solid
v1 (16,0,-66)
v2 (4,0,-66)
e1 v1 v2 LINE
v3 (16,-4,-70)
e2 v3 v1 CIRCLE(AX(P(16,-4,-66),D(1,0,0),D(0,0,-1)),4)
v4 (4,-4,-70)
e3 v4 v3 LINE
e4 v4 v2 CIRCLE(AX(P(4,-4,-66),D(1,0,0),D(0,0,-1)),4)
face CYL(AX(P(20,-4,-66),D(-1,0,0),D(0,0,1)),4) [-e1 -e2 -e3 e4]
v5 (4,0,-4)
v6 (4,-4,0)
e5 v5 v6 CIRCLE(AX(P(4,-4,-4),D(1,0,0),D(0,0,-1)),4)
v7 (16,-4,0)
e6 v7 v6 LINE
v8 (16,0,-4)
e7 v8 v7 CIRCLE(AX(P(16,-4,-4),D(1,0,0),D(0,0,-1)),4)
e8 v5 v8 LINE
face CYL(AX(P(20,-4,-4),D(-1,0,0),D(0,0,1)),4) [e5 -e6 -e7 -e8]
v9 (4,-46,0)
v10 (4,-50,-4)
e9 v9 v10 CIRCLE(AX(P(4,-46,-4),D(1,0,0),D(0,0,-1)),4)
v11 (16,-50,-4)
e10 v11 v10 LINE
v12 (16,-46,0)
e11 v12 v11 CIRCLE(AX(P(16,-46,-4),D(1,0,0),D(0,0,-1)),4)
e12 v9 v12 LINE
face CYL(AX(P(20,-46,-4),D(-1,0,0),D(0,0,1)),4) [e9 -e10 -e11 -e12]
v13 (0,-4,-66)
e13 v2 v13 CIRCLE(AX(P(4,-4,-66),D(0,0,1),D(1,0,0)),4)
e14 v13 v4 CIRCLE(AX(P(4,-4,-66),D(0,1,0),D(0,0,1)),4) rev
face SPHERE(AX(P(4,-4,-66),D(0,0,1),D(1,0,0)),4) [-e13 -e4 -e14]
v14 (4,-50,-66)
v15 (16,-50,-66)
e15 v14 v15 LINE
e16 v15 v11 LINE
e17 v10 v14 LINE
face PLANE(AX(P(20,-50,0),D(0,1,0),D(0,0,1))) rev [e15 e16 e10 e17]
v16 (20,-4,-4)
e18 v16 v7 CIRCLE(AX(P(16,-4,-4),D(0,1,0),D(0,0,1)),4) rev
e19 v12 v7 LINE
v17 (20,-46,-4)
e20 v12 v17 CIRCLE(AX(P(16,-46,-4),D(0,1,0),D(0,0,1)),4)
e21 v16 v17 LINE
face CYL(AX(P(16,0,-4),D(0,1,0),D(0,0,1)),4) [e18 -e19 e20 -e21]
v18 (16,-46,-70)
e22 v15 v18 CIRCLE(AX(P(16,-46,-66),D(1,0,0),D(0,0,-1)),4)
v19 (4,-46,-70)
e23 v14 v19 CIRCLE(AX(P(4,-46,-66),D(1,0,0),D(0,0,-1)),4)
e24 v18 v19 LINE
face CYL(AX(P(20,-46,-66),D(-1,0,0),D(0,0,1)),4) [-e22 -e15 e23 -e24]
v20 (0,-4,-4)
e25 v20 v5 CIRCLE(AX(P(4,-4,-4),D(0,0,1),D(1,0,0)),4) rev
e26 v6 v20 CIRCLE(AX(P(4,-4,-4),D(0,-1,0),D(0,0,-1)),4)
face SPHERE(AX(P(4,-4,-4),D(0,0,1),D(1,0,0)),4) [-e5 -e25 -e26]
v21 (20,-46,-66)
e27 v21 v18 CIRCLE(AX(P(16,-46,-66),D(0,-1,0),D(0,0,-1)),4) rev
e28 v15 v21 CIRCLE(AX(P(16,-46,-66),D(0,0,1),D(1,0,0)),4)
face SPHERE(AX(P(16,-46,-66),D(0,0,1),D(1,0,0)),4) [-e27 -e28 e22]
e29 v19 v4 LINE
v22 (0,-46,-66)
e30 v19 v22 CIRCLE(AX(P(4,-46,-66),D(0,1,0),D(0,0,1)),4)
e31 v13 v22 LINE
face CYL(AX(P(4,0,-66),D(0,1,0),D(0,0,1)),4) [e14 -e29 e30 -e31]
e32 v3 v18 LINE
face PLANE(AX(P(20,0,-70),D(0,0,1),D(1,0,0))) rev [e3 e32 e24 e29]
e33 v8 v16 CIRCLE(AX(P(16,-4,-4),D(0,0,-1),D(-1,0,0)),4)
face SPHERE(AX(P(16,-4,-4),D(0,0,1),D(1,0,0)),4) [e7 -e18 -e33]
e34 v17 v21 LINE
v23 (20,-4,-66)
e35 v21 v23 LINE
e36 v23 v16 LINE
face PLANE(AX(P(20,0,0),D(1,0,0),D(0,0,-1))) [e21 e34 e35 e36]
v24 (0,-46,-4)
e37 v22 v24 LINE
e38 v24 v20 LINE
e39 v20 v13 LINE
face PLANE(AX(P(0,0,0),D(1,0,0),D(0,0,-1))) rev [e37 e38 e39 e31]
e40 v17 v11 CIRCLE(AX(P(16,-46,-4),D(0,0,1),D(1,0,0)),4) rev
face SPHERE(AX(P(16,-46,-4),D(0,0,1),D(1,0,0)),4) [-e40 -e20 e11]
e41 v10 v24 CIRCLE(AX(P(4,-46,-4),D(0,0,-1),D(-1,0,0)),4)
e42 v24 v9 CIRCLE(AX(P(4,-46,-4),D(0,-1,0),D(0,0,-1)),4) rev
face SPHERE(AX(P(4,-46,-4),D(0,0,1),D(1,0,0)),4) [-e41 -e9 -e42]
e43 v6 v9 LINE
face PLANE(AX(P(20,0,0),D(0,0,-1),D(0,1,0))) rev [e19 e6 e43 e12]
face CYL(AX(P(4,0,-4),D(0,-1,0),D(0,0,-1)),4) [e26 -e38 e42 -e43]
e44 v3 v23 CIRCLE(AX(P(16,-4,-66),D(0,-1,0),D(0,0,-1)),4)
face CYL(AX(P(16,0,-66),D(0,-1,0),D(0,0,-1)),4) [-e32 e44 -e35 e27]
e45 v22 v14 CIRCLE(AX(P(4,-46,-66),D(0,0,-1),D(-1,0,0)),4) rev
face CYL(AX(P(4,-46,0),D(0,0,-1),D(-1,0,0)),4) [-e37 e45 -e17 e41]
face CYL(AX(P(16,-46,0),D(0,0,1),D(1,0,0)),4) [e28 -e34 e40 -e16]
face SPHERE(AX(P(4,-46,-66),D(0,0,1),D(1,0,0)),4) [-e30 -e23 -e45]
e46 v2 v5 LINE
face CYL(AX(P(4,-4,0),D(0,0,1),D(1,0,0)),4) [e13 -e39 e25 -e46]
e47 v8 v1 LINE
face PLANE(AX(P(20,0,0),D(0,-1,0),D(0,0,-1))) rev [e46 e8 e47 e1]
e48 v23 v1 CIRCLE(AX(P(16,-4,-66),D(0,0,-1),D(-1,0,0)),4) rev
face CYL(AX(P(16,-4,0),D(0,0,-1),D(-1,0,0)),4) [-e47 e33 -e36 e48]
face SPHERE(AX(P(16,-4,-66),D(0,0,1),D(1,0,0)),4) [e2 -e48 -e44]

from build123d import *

# Parameters (mm, degrees)
SKETCH_1_W      = 70
SKETCH_1_H      = 50
EXTRUDE_1_DEPTH = 20
FILLET_1_R      = 4
FILLET_2_R      = 4
FILLET_3_R      = 4


with BuildPart() as part:
    # 草图1 → 凸台-拉伸1 (new body)
    with BuildSketch(Plane(origin=(0, 0, 0), x_dir=(0, 0, -1), z_dir=(1, 0, 0))):
        with Locations((35, -25)):
            Rectangle(SKETCH_1_W, SKETCH_1_H)
    extrude(amount=EXTRUDE_1_DEPTH)

    # 圆角1
    fillet_1_edges = [part.edges().sort_by_distance(p)[0] for p in [
        (0, 0, -35),
        (0, -25, -70),
        (0, -50, -35),
        (0, -25, 0),
    ]]
    fillet(fillet_1_edges, radius=FILLET_1_R)

    # 圆角2
    fillet_2_edges = [part.edges().sort_by_distance(p)[0] for p in [
        (20, -25, -70),
        (20, 0, -35),
        (20, -25, 0),
        (20, -50, -35),
    ]]
    fillet(fillet_2_edges, radius=FILLET_2_R)

    # 圆角3
    # the kernel refuses this fillet: 4 mm, written as the material it takes off along each edge
    with BuildSketch(Plane(origin=(4, -46, -4), x_dir=(0, -1, 0), z_dir=(0, 0, 1))) as fillet_3_piece_1_section:
        Polygon((0, 0), (FILLET_3_R, 0), (FILLET_3_R, -FILLET_3_R), (0, -FILLET_3_R), align=None)
    fillet_3_piece_1 = extrude(amount=FILLET_3_R, mode=Mode.PRIVATE)
    fillet_3_piece_1 = fillet_3_piece_1 - Plane(origin=(4, -46, -4), x_dir=(0.7071067811865475, 0.7071067811865475, 0), z_dir=(0, 0, 1)) * Sphere(FILLET_3_R, mode=Mode.PRIVATE)
    add(fillet_3_piece_1, mode=Mode.SUBTRACT)
    with BuildSketch(Plane(origin=(4, -4, -4), x_dir=(0, 0, 1), z_dir=(0, 1, 0))) as fillet_3_piece_2_section:
        Polygon((0, 0), (FILLET_3_R, 0), (FILLET_3_R, -FILLET_3_R), (0, -FILLET_3_R), align=None)
    fillet_3_piece_2 = extrude(amount=FILLET_3_R, mode=Mode.PRIVATE)
    fillet_3_piece_2 = fillet_3_piece_2 - Plane(origin=(4, -4, -4), x_dir=(0.7071067811865475, 0, -0.7071067811865475), z_dir=(0, 1, 0)) * Sphere(FILLET_3_R, mode=Mode.PRIVATE)
    add(fillet_3_piece_2, mode=Mode.SUBTRACT)
    with BuildSketch(Plane(origin=(4, -46, -66), x_dir=(0, -1, 0), z_dir=(0, 0, -1))) as fillet_3_piece_3_section:
        Polygon((0, 0), (FILLET_3_R, 0), (FILLET_3_R, FILLET_3_R), (0, FILLET_3_R), align=None)
    fillet_3_piece_3 = extrude(amount=FILLET_3_R, mode=Mode.PRIVATE)
    fillet_3_piece_3 = fillet_3_piece_3 - Plane(origin=(4, -46, -66), x_dir=(0.7071067811865475, 0.7071067811865475, 0), z_dir=(0, 0, -1)) * Sphere(FILLET_3_R, mode=Mode.PRIVATE)
    add(fillet_3_piece_3, mode=Mode.SUBTRACT)
    with BuildSketch(Plane(origin=(4, -4, -66), x_dir=(0, 0, -1), z_dir=(0, 1, 0))) as fillet_3_piece_4_section:
        Polygon((0, 0), (FILLET_3_R, 0), (FILLET_3_R, FILLET_3_R), (0, FILLET_3_R), align=None)
    fillet_3_piece_4 = extrude(amount=FILLET_3_R, mode=Mode.PRIVATE)
    fillet_3_piece_4 = fillet_3_piece_4 - Plane(origin=(4, -4, -66), x_dir=(0.7071067811865475, 0, 0.7071067811865475), z_dir=(0, 1, 0)) * Sphere(FILLET_3_R, mode=Mode.PRIVATE)
    add(fillet_3_piece_4, mode=Mode.SUBTRACT)
    with BuildSketch(Plane(origin=(16, -4, -66), x_dir=(0, 0, -1), z_dir=(0, 1, 0))) as fillet_3_piece_5_section:
        Polygon((0, 0), (FILLET_3_R, 0), (FILLET_3_R, -FILLET_3_R), (0, -FILLET_3_R), align=None)
    fillet_3_piece_5 = extrude(amount=FILLET_3_R, mode=Mode.PRIVATE)
    fillet_3_piece_5 = fillet_3_piece_5 - Plane(origin=(16, -4, -66), x_dir=(-0.7071067811865475, 0, 0.7071067811865475), z_dir=(0, 1, 0)) * Sphere(FILLET_3_R, mode=Mode.PRIVATE)
    add(fillet_3_piece_5, mode=Mode.SUBTRACT)
    with BuildSketch(Plane(origin=(16, -46, -66), x_dir=(0, -1, 0), z_dir=(0, 0, -1))) as fillet_3_piece_6_section:
        Polygon((0, 0), (FILLET_3_R, 0), (FILLET_3_R, -FILLET_3_R), (0, -FILLET_3_R), align=None)
    fillet_3_piece_6 = extrude(amount=FILLET_3_R, mode=Mode.PRIVATE)
    fillet_3_piece_6 = fillet_3_piece_6 - Plane(origin=(16, -46, -66), x_dir=(-0.7071067811865475, 0.7071067811865475, 0), z_dir=(0, 0, -1)) * Sphere(FILLET_3_R, mode=Mode.PRIVATE)
    add(fillet_3_piece_6, mode=Mode.SUBTRACT)
    with BuildSketch(Plane(origin=(16, -4, -4), x_dir=(0, 0, 1), z_dir=(0, 1, 0))) as fillet_3_piece_7_section:
        Polygon((0, 0), (FILLET_3_R, 0), (FILLET_3_R, FILLET_3_R), (0, FILLET_3_R), align=None)
    fillet_3_piece_7 = extrude(amount=FILLET_3_R, mode=Mode.PRIVATE)
    fillet_3_piece_7 = fillet_3_piece_7 - Plane(origin=(16, -4, -4), x_dir=(-0.7071067811865475, 0, -0.7071067811865475), z_dir=(0, 1, 0)) * Sphere(FILLET_3_R, mode=Mode.PRIVATE)
    add(fillet_3_piece_7, mode=Mode.SUBTRACT)
    with BuildSketch(Plane(origin=(16, -46, -4), x_dir=(0, -1, 0), z_dir=(0, 0, 1))) as fillet_3_piece_8_section:
        Polygon((0, 0), (FILLET_3_R, 0), (FILLET_3_R, FILLET_3_R), (0, FILLET_3_R), align=None)
    fillet_3_piece_8 = extrude(amount=FILLET_3_R, mode=Mode.PRIVATE)
    fillet_3_piece_8 = fillet_3_piece_8 - Plane(origin=(16, -46, -4), x_dir=(-0.7071067811865475, 0.7071067811865475, 0), z_dir=(0, 0, 1)) * Sphere(FILLET_3_R, mode=Mode.PRIVATE)
    add(fillet_3_piece_8, mode=Mode.SUBTRACT)
    with BuildSketch(Plane(origin=(4, 0, 0), x_dir=(0, 0, -1), z_dir=(1, 0, 0)), Plane(origin=(4, -50, 0), x_dir=(0, 1, 0), z_dir=(1, 0, 0))) as fillet_3_piece_9:
        with BuildLine():
            CenterArc((FILLET_3_R, -FILLET_3_R), FILLET_3_R, 90, 90)
            Line((0, -FILLET_3_R), (0, 0))
            Line((0, 0), (FILLET_3_R, 0))
        make_face()
    extrude(amount=12, mode=Mode.SUBTRACT)
    with BuildSketch(Plane(origin=(4, -50, -70), x_dir=(0, 1, 0), z_dir=(1, 0, 0)), Plane(origin=(4, 0, -70), x_dir=(0, 0, 1), z_dir=(1, 0, 0))) as fillet_3_piece_10:
        with BuildLine():
            CenterArc((FILLET_3_R, FILLET_3_R), FILLET_3_R, 180, 90)
            Line((0, FILLET_3_R), (0, 0))
            Line((0, 0), (FILLET_3_R, 0))
        make_face()
    extrude(amount=12, mode=Mode.SUBTRACT)


solid = part.part
